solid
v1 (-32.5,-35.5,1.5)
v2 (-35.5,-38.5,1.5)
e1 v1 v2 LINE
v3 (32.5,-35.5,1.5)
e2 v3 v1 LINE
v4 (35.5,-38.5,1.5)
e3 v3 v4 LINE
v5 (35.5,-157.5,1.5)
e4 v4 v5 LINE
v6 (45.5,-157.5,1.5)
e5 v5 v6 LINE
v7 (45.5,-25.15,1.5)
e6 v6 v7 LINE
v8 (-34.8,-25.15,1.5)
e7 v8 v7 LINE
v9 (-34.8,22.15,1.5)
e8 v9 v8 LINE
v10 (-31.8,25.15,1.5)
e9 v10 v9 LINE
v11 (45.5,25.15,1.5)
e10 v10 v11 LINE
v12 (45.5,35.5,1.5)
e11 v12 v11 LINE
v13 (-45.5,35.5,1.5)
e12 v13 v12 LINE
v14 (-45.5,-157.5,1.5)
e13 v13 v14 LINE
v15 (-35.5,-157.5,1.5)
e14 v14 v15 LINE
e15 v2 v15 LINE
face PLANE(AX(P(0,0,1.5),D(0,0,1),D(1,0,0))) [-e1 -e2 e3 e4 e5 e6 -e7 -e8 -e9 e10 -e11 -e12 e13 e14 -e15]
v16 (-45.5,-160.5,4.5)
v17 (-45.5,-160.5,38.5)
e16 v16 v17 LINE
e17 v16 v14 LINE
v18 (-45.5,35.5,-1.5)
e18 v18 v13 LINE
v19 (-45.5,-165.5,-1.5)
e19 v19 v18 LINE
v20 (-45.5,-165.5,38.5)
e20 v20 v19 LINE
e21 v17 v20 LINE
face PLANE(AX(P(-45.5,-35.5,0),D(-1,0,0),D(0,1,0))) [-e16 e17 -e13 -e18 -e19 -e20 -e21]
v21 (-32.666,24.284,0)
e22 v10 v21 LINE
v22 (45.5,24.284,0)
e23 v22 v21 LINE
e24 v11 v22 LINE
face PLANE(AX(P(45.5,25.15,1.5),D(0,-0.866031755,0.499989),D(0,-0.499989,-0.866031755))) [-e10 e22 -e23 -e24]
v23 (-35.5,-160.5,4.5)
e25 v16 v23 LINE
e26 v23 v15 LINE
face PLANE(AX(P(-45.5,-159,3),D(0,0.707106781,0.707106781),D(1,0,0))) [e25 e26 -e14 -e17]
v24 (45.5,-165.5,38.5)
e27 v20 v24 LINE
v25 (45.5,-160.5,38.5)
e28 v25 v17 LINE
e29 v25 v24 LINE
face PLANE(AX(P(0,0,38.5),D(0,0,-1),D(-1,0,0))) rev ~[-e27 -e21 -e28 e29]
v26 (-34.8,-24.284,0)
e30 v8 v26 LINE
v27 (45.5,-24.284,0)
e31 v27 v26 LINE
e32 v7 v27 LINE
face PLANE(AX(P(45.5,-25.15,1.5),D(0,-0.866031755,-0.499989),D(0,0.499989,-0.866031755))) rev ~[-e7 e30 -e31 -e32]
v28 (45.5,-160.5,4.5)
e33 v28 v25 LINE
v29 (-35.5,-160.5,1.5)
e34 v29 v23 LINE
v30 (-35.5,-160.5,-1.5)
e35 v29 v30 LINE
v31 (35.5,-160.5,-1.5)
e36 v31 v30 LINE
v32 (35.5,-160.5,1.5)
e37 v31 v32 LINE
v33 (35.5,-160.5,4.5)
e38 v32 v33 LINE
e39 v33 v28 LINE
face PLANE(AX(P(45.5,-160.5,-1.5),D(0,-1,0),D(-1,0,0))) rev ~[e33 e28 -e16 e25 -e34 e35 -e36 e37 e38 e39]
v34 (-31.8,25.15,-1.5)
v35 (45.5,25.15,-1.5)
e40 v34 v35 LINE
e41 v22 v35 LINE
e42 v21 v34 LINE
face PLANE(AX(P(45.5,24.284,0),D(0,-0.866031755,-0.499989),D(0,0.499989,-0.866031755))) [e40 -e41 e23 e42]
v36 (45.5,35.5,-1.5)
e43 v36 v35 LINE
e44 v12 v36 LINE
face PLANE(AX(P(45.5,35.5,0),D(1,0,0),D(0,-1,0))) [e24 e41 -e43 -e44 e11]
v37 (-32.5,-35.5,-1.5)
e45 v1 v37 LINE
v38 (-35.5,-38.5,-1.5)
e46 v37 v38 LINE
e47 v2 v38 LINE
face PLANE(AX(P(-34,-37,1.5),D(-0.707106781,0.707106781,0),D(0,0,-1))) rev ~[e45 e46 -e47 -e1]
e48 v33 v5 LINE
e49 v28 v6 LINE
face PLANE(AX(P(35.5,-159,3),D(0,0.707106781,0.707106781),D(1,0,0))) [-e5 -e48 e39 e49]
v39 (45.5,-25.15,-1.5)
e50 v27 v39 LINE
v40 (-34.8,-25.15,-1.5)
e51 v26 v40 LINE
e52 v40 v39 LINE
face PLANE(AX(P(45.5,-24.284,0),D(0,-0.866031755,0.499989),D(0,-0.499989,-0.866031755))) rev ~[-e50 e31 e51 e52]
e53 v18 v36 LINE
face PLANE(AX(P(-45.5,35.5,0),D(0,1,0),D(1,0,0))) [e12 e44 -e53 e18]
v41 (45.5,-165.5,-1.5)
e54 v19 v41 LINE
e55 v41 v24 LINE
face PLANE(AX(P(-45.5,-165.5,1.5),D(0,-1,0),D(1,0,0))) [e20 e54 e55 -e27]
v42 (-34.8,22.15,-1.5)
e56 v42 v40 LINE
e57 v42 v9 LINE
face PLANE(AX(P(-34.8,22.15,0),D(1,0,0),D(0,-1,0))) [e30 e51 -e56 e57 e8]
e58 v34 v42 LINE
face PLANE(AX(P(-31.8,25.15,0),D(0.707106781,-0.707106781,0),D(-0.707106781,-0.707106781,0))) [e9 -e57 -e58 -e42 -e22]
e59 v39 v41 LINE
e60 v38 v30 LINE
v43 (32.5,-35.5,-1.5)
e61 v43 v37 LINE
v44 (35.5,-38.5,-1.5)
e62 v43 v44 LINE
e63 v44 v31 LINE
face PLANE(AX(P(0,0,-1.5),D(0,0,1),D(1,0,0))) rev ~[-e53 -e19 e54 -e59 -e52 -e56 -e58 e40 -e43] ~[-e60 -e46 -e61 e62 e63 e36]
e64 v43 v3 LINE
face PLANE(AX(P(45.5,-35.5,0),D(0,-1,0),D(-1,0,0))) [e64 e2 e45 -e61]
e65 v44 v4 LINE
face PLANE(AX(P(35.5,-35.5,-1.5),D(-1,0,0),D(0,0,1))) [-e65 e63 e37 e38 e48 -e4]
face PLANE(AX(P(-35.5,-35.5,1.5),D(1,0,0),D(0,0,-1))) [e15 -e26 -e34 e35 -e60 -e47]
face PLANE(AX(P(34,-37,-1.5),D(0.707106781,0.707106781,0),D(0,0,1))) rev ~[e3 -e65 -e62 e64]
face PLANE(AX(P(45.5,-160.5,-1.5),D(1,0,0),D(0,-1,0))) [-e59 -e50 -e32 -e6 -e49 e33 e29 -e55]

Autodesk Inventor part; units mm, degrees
ref_plane "YZ Plane" through (0, 0, 0) normal (1, 0, 0) x (0, 1, 0)
ref_plane "XZ Plane" through (0, 0, 0) normal (0, 1, 0) x (-1, 0, 0)
ref_plane "XY Plane" through (0, 0, 0) normal (0, 0, 1) x (1, 0, 0)
sketch "Skizze1" plane through (0, 0, 0) normal (0, 0, 1) x (1, 0, 0)
  line L0 (-45.5, 35.5) -> (45.5, 35.5)
  line L1 (45.5, 35.5) -> (45.5, -35.5)
  line L2 (45.5, -35.5) -> (-45.5, -35.5)
  line L3 (-45.5, -35.5) -> (-45.5, 35.5)
  line L4 (-45.5, 35.5) -> (45.5, -35.5) construction
  line L5 (45.5, 35.5) -> (-45.5, -35.5) construction
  line L6 (-34.8, 25.15) -> (45.5, 25.15)
  line L7 (-34.8, -25.15) -> (45.5, -25.15)
  line L8 (0, 0) -> (46.8412, 0)
  line L9 (-34.8, 25.15) -> (-34.8, -25.15)
  line L10 (-31.8, 25.15) -> (-40.5715, 16.3785)
  line L11 (-31.8, 25.15) -> (-19.3953, 25.15) construction
  point P0 (-34.8, 22.15)
  dimension "d0" = 91
  dimension "d1" = 71
  dimension "d4" = 80.3
  dimension "d5" = 50.3
  dimension "d23" = 135
  dimension "d24" = 3
extrude "Extrusion1" add sketch "Skizze1" along normal mid plane 3 contours L0 L1 L6 L9 L7 L2 L3 | L10 L9 L6
sketch "Skizze3" plane through (45.5, 25.15, 1.5) normal (1, 0, 0) x (0, 0, -1)
  line L0 (3, 0) -> (0, 0) projected
  line L1 (0, 0) -> (1.5, -0.866)
  line L2 (0, 0) -> (1.5, 0) construction
  line L3 (3, -50.3) -> (0, -50.3) projected
  line L4 (1.5, 0) -> (1.5, -50.3)
  line L5 (1.5, -0.866) -> (3, 0)
  line L6 (1.5, -25.15) -> (8.6012, -25.15)
  line L7 (0, -50.3) -> (1.5, -49.434)
  line L8 (1.5, -49.434) -> (3, -50.3)
  dimension "d7" = 30
extrude "Extrusion2" add sketch "Skizze3" against normal up to surface (80.3 mm away)
sketch "Skizze4" plane through (-45.5, -35.5, 1.5) normal (0, -1, 0) x (1, 0, 0)
  line L0 (0, 0) -> (91, 0) projected
  line L1 (91, -3) -> (0, -3) projected
  line L2 (0, 0) -> (10, 0)
  line L3 (10, 0) -> (10, -3)
  line L4 (10, -3) -> (0, -3)
  line L5 (0, -3) -> (0, 0)
  line L6 (91, -3) -> (91, 0) projected
  line L7 (91, -3) -> (81, -3)
  line L8 (81, -3) -> (81, 0)
  line L9 (81, 0) -> (91, 0)
  line L10 (91, 0) -> (91, -3)
  point P0 (45.5, -1.5)
  point P1 (81, 0)
  point P2 (81, -3)
  dimension "d10" = 10
  dimension "d11" = 10
extrude "Extrusion3" add sketch "Skizze4" along normal blind 130 contours L0 L3 L1 L5 | L0 L6 L1 L8
chamfer "Fase1" distance 3 angle 45 2 edges at (-35.5, -35.5, 0) (35.5, -35.5, 0)
sketch "Skizze6" plane through (0, 0, -1.5) normal (0, 0, -1) x (-1, 0, 0)
  line L0 (45.5, 35.5) -> (45.5, -165.5) projected
  line L1 (-45.5, -25.15) -> (-45.5, -165.5) projected
  line L2 (45.5, -165.5) -> (-45.5, -165.5)
  line L3 (-45.5, -165.5) -> (-45.5, -160.5)
  line L4 (-45.5, -160.5) -> (45.5, -160.5)
  line L5 (45.5, -160.5) -> (45.5, -165.5)
  point P0 (0, 0)
  dimension "d20" = 5
extrude "Extrusion5" add sketch "Skizze6" against normal blind 40
chamfer "Fase2" distance 3 angle 45 2 edges at (-40.5, -160.5, 1.5) (40.5, -160.5, 1.5)
equation "\"d11\" = d10"
properties part number "PiScanMiniDomeHolder"
